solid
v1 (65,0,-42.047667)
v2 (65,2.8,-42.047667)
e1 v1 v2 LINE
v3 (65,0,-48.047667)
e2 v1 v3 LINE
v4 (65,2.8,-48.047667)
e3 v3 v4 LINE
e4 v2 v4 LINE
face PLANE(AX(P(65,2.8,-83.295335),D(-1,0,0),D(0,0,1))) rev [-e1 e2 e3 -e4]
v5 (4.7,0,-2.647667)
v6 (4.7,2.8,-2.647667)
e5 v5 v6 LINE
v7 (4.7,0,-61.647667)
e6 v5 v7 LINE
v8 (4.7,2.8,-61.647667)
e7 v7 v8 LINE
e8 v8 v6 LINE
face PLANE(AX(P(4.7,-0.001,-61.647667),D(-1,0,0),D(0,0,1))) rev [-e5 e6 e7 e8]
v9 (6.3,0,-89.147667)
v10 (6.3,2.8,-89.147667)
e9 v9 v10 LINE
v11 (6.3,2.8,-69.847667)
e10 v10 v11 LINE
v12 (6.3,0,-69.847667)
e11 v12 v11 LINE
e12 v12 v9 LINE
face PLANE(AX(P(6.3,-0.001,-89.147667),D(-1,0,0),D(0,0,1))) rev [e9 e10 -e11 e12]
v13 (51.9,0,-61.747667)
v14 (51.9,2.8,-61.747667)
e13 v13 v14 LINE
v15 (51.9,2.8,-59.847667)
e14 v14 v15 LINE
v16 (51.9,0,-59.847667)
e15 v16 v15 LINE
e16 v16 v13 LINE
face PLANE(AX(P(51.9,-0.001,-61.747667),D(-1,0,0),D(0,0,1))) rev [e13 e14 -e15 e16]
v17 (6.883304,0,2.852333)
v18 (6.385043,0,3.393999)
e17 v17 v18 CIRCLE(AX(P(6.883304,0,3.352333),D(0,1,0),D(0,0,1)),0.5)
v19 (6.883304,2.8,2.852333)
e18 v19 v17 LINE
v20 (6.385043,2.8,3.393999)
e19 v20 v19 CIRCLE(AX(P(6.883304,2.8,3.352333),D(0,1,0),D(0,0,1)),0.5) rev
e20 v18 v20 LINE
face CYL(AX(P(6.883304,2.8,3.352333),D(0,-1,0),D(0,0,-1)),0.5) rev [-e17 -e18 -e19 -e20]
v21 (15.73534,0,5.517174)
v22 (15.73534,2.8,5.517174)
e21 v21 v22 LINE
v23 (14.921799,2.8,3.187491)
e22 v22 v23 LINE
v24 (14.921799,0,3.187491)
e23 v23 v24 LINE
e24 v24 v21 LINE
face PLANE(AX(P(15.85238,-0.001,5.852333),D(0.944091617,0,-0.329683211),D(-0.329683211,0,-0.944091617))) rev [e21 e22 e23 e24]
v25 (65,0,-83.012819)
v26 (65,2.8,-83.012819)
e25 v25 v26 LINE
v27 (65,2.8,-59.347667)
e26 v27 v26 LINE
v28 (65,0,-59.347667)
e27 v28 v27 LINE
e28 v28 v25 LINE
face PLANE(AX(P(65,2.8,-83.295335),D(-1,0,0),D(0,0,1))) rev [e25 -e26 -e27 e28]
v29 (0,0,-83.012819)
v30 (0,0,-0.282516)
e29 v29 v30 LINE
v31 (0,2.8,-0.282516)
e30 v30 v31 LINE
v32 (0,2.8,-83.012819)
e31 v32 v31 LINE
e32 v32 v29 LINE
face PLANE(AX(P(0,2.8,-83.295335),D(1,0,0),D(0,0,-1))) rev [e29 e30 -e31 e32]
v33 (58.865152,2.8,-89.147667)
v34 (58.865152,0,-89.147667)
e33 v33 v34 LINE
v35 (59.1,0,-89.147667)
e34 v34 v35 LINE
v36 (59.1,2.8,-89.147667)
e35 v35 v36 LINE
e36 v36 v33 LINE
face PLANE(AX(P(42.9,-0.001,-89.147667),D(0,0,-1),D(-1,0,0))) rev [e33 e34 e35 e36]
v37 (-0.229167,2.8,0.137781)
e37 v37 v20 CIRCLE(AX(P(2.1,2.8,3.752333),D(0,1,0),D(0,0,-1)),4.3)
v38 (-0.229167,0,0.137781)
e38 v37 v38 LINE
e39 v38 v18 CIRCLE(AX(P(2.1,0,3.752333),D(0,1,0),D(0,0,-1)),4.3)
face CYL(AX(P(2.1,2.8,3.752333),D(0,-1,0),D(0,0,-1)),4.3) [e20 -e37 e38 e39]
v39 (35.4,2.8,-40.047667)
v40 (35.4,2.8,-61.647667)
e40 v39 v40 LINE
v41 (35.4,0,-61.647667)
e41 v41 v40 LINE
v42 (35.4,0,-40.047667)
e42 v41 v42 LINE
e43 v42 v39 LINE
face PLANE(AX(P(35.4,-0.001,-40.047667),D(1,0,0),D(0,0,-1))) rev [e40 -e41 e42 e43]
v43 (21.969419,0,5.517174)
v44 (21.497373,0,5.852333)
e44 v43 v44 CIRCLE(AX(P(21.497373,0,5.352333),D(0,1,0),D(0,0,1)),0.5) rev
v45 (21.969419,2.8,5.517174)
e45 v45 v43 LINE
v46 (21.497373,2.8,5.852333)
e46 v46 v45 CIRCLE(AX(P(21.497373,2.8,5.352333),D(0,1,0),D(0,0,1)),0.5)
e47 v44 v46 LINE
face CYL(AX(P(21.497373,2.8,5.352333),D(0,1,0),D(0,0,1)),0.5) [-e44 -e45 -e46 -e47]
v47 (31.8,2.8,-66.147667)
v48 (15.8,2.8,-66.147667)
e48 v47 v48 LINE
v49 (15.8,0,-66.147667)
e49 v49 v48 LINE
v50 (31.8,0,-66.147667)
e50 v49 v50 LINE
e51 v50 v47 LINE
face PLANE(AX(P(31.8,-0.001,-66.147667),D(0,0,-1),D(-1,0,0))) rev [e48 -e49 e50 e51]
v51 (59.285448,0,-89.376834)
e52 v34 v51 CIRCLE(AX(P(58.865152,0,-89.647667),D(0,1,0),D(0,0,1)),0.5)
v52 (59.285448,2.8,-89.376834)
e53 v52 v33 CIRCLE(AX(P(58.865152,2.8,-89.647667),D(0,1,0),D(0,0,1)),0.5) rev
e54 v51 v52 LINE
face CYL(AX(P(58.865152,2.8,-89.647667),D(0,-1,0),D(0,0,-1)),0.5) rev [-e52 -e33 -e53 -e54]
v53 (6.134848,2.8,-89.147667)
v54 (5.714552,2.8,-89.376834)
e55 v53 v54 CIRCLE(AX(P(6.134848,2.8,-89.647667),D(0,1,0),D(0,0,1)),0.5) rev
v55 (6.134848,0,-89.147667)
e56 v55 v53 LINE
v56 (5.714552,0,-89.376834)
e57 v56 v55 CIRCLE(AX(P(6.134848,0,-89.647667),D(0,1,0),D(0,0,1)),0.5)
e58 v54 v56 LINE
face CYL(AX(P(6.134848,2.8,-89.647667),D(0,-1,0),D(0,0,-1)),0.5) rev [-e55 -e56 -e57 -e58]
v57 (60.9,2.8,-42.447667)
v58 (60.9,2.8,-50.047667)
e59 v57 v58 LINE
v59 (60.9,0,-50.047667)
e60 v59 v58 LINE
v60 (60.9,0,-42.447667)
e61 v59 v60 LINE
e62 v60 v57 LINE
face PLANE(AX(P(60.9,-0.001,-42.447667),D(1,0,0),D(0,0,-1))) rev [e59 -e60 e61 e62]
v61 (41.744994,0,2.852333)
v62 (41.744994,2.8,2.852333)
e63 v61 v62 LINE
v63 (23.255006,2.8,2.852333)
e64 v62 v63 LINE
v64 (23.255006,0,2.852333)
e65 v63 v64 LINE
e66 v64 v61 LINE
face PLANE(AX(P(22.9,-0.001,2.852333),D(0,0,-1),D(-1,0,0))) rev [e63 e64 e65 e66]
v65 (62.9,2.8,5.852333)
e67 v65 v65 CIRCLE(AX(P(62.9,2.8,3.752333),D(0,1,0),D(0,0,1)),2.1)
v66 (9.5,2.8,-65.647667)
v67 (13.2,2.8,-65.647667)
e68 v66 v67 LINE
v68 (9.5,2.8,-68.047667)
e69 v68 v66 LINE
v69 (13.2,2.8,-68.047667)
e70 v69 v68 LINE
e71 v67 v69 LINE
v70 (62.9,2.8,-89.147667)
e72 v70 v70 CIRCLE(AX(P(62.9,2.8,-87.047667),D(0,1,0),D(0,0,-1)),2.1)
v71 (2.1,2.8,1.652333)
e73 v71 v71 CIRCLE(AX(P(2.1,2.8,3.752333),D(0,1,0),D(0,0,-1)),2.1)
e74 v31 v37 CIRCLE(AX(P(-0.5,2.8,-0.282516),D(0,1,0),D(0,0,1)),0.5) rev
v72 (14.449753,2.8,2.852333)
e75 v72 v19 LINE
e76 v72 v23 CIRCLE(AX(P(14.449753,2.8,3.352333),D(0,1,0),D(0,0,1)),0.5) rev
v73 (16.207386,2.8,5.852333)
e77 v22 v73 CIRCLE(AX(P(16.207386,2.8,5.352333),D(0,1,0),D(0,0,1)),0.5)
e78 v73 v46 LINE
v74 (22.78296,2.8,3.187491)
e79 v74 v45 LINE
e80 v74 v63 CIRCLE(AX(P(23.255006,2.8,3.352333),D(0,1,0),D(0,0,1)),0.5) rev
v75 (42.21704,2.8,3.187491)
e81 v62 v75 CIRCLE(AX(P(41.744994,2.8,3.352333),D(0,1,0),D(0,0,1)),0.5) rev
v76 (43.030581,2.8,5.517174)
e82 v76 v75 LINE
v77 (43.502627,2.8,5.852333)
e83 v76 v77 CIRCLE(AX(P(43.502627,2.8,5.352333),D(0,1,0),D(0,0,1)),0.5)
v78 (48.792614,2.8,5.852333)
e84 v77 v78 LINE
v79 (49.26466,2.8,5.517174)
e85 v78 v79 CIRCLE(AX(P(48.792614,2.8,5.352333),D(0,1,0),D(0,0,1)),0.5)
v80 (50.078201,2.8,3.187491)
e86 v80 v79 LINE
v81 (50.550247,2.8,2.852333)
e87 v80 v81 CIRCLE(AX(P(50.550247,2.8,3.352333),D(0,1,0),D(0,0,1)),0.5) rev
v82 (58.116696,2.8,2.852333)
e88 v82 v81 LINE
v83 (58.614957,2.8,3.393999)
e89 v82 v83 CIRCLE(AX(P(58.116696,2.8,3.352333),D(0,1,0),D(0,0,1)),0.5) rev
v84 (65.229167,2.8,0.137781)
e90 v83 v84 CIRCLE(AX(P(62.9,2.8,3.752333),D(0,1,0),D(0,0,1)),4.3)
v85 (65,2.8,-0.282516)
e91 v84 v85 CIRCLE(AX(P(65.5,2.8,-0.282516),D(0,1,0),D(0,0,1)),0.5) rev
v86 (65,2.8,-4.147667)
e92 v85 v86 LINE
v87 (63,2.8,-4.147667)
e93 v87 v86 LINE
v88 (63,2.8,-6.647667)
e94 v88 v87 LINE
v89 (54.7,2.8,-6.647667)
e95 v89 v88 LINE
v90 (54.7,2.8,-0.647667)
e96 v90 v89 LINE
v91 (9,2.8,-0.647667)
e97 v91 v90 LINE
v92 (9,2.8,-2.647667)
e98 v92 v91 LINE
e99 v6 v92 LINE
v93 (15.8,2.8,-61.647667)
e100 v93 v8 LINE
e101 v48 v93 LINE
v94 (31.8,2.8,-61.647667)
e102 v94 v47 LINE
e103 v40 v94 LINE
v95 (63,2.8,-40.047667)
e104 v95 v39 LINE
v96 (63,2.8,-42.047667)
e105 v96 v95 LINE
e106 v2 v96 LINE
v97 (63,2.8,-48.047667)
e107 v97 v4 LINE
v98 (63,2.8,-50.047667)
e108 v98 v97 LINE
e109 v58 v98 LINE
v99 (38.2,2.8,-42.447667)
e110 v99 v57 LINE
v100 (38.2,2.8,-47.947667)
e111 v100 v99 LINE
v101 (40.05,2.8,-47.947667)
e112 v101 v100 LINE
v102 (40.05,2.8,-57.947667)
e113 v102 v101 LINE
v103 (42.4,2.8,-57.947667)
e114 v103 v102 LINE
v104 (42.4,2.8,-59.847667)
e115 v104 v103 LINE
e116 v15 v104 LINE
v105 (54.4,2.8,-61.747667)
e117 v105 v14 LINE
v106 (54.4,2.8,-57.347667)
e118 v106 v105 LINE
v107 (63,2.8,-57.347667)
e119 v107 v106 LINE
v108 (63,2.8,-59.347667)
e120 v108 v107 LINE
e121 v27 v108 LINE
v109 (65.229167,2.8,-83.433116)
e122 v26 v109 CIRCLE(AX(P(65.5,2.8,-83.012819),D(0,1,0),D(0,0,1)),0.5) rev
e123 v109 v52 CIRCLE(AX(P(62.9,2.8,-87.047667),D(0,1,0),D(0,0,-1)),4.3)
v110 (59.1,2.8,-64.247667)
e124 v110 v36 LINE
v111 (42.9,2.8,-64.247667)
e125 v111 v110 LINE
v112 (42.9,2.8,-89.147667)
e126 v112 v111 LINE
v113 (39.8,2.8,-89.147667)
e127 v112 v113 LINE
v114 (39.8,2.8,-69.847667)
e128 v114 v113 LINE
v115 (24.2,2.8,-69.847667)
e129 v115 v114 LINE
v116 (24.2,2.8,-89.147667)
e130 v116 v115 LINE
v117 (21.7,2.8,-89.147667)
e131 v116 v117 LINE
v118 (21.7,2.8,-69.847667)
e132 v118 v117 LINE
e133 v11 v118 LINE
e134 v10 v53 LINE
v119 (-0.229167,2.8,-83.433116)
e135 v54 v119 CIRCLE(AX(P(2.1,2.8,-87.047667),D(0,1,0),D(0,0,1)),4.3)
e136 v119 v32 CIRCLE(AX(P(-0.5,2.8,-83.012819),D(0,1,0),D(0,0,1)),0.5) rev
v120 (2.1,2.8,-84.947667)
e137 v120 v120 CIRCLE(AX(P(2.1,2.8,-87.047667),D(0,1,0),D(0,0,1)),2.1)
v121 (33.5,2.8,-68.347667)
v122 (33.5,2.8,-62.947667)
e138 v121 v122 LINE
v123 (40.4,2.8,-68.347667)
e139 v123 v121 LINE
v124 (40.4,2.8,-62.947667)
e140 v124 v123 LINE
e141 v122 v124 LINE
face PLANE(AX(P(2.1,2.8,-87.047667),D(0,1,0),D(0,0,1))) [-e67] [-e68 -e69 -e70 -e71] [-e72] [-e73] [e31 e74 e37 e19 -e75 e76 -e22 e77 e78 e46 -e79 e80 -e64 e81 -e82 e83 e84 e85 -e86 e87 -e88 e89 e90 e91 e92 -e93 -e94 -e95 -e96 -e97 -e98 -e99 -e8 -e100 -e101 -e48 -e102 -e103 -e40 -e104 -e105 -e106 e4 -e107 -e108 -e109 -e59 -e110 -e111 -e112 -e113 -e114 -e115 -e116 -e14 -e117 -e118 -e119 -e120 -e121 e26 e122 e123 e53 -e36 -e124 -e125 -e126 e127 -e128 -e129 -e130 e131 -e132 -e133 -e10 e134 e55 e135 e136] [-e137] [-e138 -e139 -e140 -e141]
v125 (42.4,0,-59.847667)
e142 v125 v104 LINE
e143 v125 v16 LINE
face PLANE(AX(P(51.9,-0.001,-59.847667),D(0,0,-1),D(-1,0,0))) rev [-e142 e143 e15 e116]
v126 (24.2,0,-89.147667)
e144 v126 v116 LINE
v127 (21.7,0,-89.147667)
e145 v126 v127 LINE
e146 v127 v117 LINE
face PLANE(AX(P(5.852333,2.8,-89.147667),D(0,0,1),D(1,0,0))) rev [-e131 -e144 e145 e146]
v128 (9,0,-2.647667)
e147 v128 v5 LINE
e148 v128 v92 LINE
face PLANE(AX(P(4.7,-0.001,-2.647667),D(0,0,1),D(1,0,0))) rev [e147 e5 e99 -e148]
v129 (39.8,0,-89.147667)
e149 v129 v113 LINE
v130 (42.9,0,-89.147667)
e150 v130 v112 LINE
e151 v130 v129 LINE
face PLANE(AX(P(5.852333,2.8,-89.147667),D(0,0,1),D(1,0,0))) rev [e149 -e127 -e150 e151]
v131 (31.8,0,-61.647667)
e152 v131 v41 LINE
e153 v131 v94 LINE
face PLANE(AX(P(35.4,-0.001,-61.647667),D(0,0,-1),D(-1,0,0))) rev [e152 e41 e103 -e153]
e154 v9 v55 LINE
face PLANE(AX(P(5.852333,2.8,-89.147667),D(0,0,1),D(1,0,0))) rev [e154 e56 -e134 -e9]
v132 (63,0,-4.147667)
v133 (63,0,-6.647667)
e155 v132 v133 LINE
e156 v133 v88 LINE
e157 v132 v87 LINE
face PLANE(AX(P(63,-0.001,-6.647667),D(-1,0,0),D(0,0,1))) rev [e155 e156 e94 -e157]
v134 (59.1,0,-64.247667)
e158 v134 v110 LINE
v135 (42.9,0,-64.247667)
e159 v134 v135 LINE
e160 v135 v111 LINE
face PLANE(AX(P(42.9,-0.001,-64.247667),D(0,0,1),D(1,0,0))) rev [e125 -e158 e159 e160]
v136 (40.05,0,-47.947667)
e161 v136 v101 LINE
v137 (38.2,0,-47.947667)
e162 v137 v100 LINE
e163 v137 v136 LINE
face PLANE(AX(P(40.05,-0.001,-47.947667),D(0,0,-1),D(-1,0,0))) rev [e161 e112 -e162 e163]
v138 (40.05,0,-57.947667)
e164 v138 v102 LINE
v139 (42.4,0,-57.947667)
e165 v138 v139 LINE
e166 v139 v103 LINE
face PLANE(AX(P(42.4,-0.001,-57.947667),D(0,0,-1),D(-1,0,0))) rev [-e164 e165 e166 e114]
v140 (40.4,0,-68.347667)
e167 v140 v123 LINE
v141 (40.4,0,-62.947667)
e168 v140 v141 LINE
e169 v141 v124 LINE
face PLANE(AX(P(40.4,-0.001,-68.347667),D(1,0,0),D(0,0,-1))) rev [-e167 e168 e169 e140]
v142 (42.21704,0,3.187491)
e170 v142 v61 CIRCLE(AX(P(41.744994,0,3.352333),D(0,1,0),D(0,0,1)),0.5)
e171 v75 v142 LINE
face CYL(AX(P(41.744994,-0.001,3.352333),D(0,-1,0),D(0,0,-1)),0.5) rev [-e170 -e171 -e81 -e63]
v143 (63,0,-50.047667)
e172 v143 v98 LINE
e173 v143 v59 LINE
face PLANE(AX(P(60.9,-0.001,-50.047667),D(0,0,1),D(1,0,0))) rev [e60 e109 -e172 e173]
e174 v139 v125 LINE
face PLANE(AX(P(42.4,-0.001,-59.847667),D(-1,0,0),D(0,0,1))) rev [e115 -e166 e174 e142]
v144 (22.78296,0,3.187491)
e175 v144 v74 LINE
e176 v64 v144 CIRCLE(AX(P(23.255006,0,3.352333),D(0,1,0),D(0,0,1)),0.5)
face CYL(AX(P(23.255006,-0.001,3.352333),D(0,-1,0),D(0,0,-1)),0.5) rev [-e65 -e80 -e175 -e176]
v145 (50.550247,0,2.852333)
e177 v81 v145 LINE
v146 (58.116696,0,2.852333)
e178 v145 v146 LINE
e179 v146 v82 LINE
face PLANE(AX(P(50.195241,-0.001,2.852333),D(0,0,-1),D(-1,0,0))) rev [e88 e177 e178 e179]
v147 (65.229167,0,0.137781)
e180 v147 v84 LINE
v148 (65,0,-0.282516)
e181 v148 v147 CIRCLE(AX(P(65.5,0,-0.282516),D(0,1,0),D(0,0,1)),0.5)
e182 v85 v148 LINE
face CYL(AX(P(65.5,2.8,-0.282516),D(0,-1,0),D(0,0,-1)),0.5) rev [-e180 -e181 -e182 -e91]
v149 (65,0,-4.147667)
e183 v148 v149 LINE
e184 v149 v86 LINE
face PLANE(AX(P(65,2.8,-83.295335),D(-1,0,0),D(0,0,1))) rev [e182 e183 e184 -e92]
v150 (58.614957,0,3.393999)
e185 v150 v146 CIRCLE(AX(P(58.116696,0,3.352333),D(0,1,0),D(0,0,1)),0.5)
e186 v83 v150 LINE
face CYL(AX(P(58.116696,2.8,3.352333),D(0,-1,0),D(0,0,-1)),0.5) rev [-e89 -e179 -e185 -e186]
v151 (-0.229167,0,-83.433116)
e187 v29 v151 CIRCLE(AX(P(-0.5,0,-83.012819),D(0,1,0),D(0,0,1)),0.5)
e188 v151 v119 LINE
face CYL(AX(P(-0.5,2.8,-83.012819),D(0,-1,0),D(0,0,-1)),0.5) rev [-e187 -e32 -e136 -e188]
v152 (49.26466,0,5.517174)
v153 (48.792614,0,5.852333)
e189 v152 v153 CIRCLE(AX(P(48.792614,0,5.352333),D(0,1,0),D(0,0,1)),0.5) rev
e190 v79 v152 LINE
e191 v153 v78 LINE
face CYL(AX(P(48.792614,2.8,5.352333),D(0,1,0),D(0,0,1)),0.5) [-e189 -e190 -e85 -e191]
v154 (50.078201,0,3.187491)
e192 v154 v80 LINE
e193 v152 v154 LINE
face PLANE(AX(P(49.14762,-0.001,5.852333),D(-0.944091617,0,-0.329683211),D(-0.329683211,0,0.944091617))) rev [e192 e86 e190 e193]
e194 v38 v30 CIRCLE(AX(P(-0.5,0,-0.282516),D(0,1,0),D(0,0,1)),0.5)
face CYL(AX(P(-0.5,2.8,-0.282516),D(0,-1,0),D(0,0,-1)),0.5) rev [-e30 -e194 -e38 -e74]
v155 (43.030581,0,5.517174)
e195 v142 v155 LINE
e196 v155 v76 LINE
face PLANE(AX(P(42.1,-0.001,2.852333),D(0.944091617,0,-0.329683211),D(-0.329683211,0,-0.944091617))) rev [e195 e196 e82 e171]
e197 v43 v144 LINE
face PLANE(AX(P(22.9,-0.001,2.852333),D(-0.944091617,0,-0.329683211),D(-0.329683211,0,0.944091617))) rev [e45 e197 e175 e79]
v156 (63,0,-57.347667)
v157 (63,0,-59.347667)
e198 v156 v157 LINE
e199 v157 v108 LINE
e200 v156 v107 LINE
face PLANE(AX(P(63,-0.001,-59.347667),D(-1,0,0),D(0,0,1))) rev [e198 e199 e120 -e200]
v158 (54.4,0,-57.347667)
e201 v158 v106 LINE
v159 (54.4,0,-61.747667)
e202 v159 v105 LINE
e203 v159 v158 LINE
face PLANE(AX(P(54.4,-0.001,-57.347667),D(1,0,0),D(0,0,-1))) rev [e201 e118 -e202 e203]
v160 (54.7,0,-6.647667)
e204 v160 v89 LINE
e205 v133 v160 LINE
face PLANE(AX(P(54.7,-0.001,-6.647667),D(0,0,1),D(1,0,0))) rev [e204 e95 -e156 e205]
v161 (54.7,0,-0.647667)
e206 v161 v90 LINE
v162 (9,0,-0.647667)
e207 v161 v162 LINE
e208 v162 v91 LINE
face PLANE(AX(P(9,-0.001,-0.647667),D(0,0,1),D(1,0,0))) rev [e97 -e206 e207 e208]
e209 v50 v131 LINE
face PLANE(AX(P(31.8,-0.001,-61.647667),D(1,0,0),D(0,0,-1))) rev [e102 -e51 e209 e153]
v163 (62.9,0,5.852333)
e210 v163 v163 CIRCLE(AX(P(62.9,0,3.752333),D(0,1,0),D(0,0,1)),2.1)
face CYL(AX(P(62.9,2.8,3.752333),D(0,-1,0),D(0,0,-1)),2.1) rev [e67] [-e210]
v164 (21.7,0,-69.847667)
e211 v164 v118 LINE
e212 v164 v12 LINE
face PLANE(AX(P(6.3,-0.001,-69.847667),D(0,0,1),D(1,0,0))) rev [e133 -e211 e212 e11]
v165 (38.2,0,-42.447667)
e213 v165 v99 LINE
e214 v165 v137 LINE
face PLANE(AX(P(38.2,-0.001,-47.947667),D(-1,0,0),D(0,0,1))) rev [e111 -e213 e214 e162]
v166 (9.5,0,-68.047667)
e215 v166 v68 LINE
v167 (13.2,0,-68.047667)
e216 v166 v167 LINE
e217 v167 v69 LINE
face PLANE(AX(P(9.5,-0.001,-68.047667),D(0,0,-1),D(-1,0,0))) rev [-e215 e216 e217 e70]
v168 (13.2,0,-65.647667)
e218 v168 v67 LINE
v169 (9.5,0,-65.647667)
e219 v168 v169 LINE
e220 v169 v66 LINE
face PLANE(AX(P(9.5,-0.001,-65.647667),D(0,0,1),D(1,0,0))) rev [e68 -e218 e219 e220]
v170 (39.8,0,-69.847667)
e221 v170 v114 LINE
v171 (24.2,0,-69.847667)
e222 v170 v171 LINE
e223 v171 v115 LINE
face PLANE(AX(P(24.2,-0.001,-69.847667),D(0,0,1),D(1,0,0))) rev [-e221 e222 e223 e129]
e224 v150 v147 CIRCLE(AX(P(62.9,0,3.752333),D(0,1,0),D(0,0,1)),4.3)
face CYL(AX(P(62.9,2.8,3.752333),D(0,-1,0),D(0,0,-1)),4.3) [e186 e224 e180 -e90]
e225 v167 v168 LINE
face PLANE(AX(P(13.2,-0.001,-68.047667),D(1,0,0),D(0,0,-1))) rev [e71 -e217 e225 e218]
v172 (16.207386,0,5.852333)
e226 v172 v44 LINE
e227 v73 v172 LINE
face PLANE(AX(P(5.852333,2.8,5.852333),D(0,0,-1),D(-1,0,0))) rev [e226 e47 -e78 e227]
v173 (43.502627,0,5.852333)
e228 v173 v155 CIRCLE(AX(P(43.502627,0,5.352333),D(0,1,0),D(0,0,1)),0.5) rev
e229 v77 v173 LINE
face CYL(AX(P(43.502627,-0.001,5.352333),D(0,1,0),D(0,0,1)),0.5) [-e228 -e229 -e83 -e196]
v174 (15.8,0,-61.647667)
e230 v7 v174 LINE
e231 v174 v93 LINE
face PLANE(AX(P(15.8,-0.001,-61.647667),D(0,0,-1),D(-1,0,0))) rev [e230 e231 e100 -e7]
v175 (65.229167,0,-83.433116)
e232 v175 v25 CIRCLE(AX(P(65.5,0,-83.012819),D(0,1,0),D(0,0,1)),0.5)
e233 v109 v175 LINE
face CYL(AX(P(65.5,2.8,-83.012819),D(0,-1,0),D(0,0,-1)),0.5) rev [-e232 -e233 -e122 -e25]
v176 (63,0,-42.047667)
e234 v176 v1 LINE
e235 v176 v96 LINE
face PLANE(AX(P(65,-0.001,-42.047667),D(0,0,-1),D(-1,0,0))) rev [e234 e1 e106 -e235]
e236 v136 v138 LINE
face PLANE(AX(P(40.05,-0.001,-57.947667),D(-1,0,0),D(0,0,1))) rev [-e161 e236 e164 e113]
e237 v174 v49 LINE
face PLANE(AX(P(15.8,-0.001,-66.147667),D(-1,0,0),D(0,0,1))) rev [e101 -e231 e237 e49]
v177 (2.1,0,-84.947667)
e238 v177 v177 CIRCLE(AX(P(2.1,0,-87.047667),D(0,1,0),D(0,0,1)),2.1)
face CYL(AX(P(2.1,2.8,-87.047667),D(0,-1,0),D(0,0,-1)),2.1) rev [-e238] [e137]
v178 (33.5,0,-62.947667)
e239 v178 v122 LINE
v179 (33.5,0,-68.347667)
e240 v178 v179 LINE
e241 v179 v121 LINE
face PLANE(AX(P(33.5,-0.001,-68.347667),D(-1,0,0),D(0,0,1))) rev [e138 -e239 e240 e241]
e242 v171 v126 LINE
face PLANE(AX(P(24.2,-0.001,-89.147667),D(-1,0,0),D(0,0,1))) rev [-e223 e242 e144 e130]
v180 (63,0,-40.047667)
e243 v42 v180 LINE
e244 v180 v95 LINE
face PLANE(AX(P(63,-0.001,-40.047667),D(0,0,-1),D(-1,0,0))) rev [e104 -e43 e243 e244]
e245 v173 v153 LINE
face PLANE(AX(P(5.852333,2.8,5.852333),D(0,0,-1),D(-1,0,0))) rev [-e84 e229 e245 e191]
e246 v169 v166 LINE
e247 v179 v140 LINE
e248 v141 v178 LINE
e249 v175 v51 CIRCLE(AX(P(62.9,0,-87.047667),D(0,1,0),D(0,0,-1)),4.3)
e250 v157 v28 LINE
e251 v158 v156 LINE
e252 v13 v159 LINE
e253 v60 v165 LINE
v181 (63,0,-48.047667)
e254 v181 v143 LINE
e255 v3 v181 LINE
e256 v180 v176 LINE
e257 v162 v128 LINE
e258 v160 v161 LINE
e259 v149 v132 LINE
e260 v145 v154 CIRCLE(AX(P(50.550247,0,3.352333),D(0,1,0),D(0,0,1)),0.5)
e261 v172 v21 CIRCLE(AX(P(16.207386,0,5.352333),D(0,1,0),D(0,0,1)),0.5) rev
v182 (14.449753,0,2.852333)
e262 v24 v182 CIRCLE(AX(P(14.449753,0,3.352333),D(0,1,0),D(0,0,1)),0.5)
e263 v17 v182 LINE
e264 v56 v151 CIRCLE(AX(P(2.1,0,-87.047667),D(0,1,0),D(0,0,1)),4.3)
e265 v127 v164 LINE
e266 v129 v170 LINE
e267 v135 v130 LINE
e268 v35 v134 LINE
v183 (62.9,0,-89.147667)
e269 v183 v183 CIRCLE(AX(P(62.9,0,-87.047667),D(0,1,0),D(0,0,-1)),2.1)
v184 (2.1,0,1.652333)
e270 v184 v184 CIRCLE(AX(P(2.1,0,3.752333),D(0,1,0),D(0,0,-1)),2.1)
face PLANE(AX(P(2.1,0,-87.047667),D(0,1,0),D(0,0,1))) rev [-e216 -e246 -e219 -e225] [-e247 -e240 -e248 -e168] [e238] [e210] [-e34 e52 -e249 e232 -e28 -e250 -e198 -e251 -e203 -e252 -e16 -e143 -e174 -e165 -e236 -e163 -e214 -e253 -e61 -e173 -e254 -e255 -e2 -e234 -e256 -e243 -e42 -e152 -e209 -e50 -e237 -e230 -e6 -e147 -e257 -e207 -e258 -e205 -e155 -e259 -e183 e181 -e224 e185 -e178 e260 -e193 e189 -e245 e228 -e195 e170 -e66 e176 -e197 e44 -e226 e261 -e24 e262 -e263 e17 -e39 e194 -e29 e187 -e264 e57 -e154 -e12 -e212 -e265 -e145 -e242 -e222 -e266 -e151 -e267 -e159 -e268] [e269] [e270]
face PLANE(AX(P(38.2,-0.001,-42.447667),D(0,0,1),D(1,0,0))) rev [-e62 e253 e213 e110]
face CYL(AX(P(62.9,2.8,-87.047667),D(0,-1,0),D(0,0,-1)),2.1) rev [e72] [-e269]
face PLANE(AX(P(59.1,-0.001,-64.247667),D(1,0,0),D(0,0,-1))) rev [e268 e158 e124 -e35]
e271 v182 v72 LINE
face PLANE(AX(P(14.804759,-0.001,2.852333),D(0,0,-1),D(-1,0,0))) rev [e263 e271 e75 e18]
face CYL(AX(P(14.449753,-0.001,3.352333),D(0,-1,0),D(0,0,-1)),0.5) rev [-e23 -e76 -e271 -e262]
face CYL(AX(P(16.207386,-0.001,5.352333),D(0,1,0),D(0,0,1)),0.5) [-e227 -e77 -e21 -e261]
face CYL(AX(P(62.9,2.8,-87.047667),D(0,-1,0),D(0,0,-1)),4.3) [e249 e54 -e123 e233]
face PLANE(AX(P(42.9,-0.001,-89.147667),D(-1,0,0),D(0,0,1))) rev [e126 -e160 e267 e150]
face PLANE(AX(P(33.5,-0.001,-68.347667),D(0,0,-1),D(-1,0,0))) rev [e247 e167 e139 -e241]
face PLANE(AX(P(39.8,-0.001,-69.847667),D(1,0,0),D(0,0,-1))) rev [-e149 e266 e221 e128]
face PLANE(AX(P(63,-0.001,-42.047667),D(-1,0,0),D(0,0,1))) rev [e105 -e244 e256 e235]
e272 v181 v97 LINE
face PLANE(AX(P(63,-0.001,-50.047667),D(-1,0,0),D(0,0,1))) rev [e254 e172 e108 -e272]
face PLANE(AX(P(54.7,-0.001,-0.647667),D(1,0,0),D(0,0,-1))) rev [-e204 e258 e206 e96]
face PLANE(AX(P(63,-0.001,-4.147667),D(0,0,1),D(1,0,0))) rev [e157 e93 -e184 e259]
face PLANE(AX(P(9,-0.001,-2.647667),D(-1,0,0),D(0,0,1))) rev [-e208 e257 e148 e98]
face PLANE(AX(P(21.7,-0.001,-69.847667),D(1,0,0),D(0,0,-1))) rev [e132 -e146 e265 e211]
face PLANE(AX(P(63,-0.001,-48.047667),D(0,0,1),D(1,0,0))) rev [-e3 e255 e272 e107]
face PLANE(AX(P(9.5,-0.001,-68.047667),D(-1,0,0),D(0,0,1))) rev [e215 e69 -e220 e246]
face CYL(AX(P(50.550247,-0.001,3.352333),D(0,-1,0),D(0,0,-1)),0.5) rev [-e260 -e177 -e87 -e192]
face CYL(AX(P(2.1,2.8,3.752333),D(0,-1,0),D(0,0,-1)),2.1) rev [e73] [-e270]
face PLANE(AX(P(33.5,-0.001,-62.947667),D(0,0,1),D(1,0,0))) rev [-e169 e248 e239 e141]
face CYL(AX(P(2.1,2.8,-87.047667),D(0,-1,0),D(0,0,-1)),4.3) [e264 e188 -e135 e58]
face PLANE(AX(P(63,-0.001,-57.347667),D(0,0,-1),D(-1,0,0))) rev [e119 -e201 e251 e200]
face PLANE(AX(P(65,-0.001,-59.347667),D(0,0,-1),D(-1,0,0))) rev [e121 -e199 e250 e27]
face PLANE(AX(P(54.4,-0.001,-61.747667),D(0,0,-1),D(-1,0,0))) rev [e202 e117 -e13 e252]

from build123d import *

# Parameters (mm, degrees)
BASEPLATE_OUTLINE_R = 2.1
BASEPLATE_DEPTH     = 2.8
CUT_EXTRUDE1_REACH  = 115.438
SKETCH3_W           = 15.4
SKETCH3_H           = 19.3
SKETCH3_W_2         = 15.6
SKETCH3_W_3         = 16.2
SKETCH3_H_2         = 24.9
SKETCH3_W_4         = 3.7
SKETCH3_H_3         = 2.4
CUT_EXTRUDE2_REACH  = 115.438
SKETCH4_W           = 6.9
SKETCH4_H           = 5.4


# Read off the part's stored shape, not the designer's step: BasePlate
with BuildPart() as part:
    # BasePlate outline → BasePlate (new body)
    with BuildSketch(Plane(origin=(0, 0, 0), x_dir=(1, 0, 0), z_dir=(0, 1, 0))):
        with BuildLine():
            Line((43.502626614, -5.852332608), (48.792614178, -5.852332608))
            ThreePointArc((48.792614178, -5.852332608), (49.082078508, -5.760021707), (49.264659986, -5.517174213))
            Line((49.264659986, -5.517174213), (50.078201202, -3.187491002))
            ThreePointArc((50.078201202, -3.187491002), (50.26078268, -2.944643509), (50.55024701, -2.852332608))
            Line((50.55024701, -2.852332608), (58.116695703, -2.852332608))
            ThreePointArc((58.116695703, -2.852332608), (58.484685739, -3.013831008), (58.614956567, -3.393999275))
            ThreePointArc((58.614956567, -3.393999275), (64.799237397, -7.61016844), (65.229166667, -0.137781095))
            ThreePointArc((65.229166667, -0.137781095), (65.061014427, 0.043158816), (65, 0.282515593))
            Line((65, 0.282515593), (65, 83.012819192))
            ThreePointArc((65, 83.012819192), (65.061014427, 83.252175969), (65.229166667, 83.433115879))
            ThreePointArc((65.229166667, 83.433115879), (65.940559159, 90.088226551), (59.285448487, 89.376834059))
            ThreePointArc((59.285448487, 89.376834059), (59.104508577, 89.208681819), (58.8651518, 89.147667392))
            Line((58.8651518, 89.147667392), (6.1348482, 89.147667392))
            ThreePointArc((6.1348482, 89.147667392), (5.895491423, 89.208681819), (5.714551513, 89.376834059))
            ThreePointArc((5.714551513, 89.376834059), (-0.940559159, 90.088226551), (-0.229166667, 83.433115879))
            ThreePointArc((-0.229166667, 83.433115879), (-0.061014427, 83.252175969), (0, 83.012819192))
            Line((0, 83.012819192), (0, 0.282515593))
            ThreePointArc((0, 0.282515593), (-0.061014427, 0.043158816), (-0.229166667, -0.137781095))
            ThreePointArc((-0.229166667, -0.137781095), (0.200762603, -7.61016844), (6.385043433, -3.393999275))
            ThreePointArc((6.385043433, -3.393999275), (6.515314261, -3.013831008), (6.883304297, -2.852332608))
            Line((6.883304297, -2.852332608), (14.44975299, -2.852332608))
            ThreePointArc((14.44975299, -2.852332608), (14.73921732, -2.944643509), (14.921798798, -3.187491002))
            Line((14.921798798, -3.187491002), (15.735340014, -5.517174213))
            ThreePointArc((15.735340014, -5.517174213), (15.917921492, -5.760021707), (16.207385822, -5.852332608))
            Line((16.207385822, -5.852332608), (21.497373386, -5.852332608))
            ThreePointArc((21.497373386, -5.852332608), (21.786837716, -5.760021707), (21.969419194, -5.517174213))
            Line((21.969419194, -5.517174213), (22.78296041, -3.187491002))
            ThreePointArc((22.78296041, -3.187491002), (22.965541888, -2.944643509), (23.255006218, -2.852332608))
            Line((23.255006218, -2.852332608), (41.744993782, -2.852332608))
            ThreePointArc((41.744993782, -2.852332608), (42.034458112, -2.944643509), (42.21703959, -3.187491002))
            Line((42.21703959, -3.187491002), (43.030580806, -5.517174213))
            ThreePointArc((43.030580806, -5.517174213), (43.213162284, -5.760021707), (43.502626614, -5.852332608))
        make_face()
        with Locations((2.1, -3.752332608)):
            Circle(BASEPLATE_OUTLINE_R, mode=Mode.SUBTRACT)
        with Locations((62.9, -3.752332608)):
            Circle(BASEPLATE_OUTLINE_R, mode=Mode.SUBTRACT)
        with Locations((2.1, 87.047667392)):
            Circle(BASEPLATE_OUTLINE_R, mode=Mode.SUBTRACT)
        with Locations((62.9, 87.047667392)):
            Circle(BASEPLATE_OUTLINE_R, mode=Mode.SUBTRACT)
    extrude(amount=BASEPLATE_DEPTH)

    # Sketch3 → Cut-Extrude1 (cut, up to next)
    with BuildSketch(Plane(origin=(0, 2.8, 0), x_dir=(1, 0, 0), z_dir=(0, 1, 0)), mode=Mode.PRIVATE) as cut_extrude1_sk1:
        Polygon((9, 0.647667392), (54.7, 0.647667392), (54.7, 6.647667392), (63, 6.647667392), (63, 4.147667392), (65, 4.147667392), (65, 42.047667392), (63, 42.047667392), (63, 40.047667392), (35.4, 40.047667392), (35.4, 61.647667392), (31.8, 61.647667392), (31.8, 66.147667392), (15.8, 66.147667392), (15.8, 61.647667392), (4.7, 61.647667392), (4.7, 2.647667392), (9, 2.647667392), align=None)
    cut_extrude1_tool1 = extrude(cut_extrude1_sk1.sketch, amount=-CUT_EXTRUDE1_REACH, mode=Mode.PRIVATE) & part.part
    # Sketch3 → Cut-Extrude1 (cut, up to next)
    with BuildSketch(Plane(origin=(0, 2.8, 0), x_dir=(1, 0, 0), z_dir=(0, 1, 0)), mode=Mode.PRIVATE) as cut_extrude1_sk2:
        with Locations((14, 79.497667392)):
            Rectangle(SKETCH3_W, SKETCH3_H)
    cut_extrude1_tool2 = extrude(cut_extrude1_sk2.sketch, amount=-CUT_EXTRUDE1_REACH, mode=Mode.PRIVATE) & part.part
    # Sketch3 → Cut-Extrude1 (cut, up to next)
    with BuildSketch(Plane(origin=(0, 2.8, 0), x_dir=(1, 0, 0), z_dir=(0, 1, 0)), mode=Mode.PRIVATE) as cut_extrude1_sk3:
        with Locations((32, 79.497667392)):
            Rectangle(SKETCH3_W_2, SKETCH3_H)
    cut_extrude1_tool3 = extrude(cut_extrude1_sk3.sketch, amount=-CUT_EXTRUDE1_REACH, mode=Mode.PRIVATE) & part.part
    # Sketch3 → Cut-Extrude1 (cut, up to next)
    with BuildSketch(Plane(origin=(0, 2.8, 0), x_dir=(1, 0, 0), z_dir=(0, 1, 0)), mode=Mode.PRIVATE) as cut_extrude1_sk4:
        with Locations((51, 76.697667392)):
            Rectangle(SKETCH3_W_3, SKETCH3_H_2)
    cut_extrude1_tool4 = extrude(cut_extrude1_sk4.sketch, amount=-CUT_EXTRUDE1_REACH, mode=Mode.PRIVATE) & part.part
    # Sketch3 → Cut-Extrude1 (cut, up to next)
    with BuildSketch(Plane(origin=(0, 2.8, 0), x_dir=(1, 0, 0), z_dir=(0, 1, 0)), mode=Mode.PRIVATE) as cut_extrude1_sk5:
        with Locations((11.35, 66.847667392)):
            Rectangle(SKETCH3_W_4, SKETCH3_H_3)
    cut_extrude1_tool5 = extrude(cut_extrude1_sk5.sketch, amount=-CUT_EXTRUDE1_REACH, mode=Mode.PRIVATE) & part.part
    add(cut_extrude1_tool1.solids().sort_by_distance((31.029219, 2.8, -28.401895))[0], mode=Mode.SUBTRACT)
    add(cut_extrude1_tool2.solids().sort_by_distance((14, 2.8, -79.497667))[0], mode=Mode.SUBTRACT)
    add(cut_extrude1_tool3.solids().sort_by_distance((32, 2.8, -79.497667))[0], mode=Mode.SUBTRACT)
    add(cut_extrude1_tool4.solids().sort_by_distance((51, 2.8, -76.697667))[0], mode=Mode.SUBTRACT)
    add(cut_extrude1_tool5.solids().sort_by_distance((11.35, 2.8, -66.847667))[0], mode=Mode.SUBTRACT)

    # Sketch4 → Cut-Extrude2 (cut, up to next)
    with BuildSketch(Plane(origin=(0, 2.8, 0), x_dir=(1, 0, 0), z_dir=(0, 1, 0)), mode=Mode.PRIVATE) as cut_extrude2_sk1:
        Polygon((65, 59.347667392), (63, 59.347667392), (63, 57.347667392), (54.4, 57.347667392), (54.4, 61.747667392), (51.9, 61.747667392), (51.9, 59.847667392), (42.4, 59.847667392), (42.4, 57.947667392), (40.05, 57.947667392), (40.05, 47.947667392), (38.2, 47.947667392), (38.2, 42.447667392), (60.9, 42.447667392), (60.9, 50.047667392), (63, 50.047667392), (63, 48.047667392), (65, 48.047667392), align=None)
    cut_extrude2_tool1 = extrude(cut_extrude2_sk1.sketch, amount=-CUT_EXTRUDE2_REACH, mode=Mode.PRIVATE) & part.part
    # Sketch4 → Cut-Extrude2 (cut, up to next)
    with BuildSketch(Plane(origin=(0, 2.8, 0), x_dir=(1, 0, 0), z_dir=(0, 1, 0)), mode=Mode.PRIVATE) as cut_extrude2_sk2:
        with Locations((36.95, 65.647667392)):
            Rectangle(SKETCH4_W, SKETCH4_H)
    cut_extrude2_tool2 = extrude(cut_extrude2_sk2.sketch, amount=-CUT_EXTRUDE2_REACH, mode=Mode.PRIVATE) & part.part
    add(cut_extrude2_tool1.solids().sort_by_distance((51.243501, 2.8, -50.961182))[0], mode=Mode.SUBTRACT)
    add(cut_extrude2_tool2.solids().sort_by_distance((36.95, 2.8, -65.647667))[0], mode=Mode.SUBTRACT)


solid = part.part
